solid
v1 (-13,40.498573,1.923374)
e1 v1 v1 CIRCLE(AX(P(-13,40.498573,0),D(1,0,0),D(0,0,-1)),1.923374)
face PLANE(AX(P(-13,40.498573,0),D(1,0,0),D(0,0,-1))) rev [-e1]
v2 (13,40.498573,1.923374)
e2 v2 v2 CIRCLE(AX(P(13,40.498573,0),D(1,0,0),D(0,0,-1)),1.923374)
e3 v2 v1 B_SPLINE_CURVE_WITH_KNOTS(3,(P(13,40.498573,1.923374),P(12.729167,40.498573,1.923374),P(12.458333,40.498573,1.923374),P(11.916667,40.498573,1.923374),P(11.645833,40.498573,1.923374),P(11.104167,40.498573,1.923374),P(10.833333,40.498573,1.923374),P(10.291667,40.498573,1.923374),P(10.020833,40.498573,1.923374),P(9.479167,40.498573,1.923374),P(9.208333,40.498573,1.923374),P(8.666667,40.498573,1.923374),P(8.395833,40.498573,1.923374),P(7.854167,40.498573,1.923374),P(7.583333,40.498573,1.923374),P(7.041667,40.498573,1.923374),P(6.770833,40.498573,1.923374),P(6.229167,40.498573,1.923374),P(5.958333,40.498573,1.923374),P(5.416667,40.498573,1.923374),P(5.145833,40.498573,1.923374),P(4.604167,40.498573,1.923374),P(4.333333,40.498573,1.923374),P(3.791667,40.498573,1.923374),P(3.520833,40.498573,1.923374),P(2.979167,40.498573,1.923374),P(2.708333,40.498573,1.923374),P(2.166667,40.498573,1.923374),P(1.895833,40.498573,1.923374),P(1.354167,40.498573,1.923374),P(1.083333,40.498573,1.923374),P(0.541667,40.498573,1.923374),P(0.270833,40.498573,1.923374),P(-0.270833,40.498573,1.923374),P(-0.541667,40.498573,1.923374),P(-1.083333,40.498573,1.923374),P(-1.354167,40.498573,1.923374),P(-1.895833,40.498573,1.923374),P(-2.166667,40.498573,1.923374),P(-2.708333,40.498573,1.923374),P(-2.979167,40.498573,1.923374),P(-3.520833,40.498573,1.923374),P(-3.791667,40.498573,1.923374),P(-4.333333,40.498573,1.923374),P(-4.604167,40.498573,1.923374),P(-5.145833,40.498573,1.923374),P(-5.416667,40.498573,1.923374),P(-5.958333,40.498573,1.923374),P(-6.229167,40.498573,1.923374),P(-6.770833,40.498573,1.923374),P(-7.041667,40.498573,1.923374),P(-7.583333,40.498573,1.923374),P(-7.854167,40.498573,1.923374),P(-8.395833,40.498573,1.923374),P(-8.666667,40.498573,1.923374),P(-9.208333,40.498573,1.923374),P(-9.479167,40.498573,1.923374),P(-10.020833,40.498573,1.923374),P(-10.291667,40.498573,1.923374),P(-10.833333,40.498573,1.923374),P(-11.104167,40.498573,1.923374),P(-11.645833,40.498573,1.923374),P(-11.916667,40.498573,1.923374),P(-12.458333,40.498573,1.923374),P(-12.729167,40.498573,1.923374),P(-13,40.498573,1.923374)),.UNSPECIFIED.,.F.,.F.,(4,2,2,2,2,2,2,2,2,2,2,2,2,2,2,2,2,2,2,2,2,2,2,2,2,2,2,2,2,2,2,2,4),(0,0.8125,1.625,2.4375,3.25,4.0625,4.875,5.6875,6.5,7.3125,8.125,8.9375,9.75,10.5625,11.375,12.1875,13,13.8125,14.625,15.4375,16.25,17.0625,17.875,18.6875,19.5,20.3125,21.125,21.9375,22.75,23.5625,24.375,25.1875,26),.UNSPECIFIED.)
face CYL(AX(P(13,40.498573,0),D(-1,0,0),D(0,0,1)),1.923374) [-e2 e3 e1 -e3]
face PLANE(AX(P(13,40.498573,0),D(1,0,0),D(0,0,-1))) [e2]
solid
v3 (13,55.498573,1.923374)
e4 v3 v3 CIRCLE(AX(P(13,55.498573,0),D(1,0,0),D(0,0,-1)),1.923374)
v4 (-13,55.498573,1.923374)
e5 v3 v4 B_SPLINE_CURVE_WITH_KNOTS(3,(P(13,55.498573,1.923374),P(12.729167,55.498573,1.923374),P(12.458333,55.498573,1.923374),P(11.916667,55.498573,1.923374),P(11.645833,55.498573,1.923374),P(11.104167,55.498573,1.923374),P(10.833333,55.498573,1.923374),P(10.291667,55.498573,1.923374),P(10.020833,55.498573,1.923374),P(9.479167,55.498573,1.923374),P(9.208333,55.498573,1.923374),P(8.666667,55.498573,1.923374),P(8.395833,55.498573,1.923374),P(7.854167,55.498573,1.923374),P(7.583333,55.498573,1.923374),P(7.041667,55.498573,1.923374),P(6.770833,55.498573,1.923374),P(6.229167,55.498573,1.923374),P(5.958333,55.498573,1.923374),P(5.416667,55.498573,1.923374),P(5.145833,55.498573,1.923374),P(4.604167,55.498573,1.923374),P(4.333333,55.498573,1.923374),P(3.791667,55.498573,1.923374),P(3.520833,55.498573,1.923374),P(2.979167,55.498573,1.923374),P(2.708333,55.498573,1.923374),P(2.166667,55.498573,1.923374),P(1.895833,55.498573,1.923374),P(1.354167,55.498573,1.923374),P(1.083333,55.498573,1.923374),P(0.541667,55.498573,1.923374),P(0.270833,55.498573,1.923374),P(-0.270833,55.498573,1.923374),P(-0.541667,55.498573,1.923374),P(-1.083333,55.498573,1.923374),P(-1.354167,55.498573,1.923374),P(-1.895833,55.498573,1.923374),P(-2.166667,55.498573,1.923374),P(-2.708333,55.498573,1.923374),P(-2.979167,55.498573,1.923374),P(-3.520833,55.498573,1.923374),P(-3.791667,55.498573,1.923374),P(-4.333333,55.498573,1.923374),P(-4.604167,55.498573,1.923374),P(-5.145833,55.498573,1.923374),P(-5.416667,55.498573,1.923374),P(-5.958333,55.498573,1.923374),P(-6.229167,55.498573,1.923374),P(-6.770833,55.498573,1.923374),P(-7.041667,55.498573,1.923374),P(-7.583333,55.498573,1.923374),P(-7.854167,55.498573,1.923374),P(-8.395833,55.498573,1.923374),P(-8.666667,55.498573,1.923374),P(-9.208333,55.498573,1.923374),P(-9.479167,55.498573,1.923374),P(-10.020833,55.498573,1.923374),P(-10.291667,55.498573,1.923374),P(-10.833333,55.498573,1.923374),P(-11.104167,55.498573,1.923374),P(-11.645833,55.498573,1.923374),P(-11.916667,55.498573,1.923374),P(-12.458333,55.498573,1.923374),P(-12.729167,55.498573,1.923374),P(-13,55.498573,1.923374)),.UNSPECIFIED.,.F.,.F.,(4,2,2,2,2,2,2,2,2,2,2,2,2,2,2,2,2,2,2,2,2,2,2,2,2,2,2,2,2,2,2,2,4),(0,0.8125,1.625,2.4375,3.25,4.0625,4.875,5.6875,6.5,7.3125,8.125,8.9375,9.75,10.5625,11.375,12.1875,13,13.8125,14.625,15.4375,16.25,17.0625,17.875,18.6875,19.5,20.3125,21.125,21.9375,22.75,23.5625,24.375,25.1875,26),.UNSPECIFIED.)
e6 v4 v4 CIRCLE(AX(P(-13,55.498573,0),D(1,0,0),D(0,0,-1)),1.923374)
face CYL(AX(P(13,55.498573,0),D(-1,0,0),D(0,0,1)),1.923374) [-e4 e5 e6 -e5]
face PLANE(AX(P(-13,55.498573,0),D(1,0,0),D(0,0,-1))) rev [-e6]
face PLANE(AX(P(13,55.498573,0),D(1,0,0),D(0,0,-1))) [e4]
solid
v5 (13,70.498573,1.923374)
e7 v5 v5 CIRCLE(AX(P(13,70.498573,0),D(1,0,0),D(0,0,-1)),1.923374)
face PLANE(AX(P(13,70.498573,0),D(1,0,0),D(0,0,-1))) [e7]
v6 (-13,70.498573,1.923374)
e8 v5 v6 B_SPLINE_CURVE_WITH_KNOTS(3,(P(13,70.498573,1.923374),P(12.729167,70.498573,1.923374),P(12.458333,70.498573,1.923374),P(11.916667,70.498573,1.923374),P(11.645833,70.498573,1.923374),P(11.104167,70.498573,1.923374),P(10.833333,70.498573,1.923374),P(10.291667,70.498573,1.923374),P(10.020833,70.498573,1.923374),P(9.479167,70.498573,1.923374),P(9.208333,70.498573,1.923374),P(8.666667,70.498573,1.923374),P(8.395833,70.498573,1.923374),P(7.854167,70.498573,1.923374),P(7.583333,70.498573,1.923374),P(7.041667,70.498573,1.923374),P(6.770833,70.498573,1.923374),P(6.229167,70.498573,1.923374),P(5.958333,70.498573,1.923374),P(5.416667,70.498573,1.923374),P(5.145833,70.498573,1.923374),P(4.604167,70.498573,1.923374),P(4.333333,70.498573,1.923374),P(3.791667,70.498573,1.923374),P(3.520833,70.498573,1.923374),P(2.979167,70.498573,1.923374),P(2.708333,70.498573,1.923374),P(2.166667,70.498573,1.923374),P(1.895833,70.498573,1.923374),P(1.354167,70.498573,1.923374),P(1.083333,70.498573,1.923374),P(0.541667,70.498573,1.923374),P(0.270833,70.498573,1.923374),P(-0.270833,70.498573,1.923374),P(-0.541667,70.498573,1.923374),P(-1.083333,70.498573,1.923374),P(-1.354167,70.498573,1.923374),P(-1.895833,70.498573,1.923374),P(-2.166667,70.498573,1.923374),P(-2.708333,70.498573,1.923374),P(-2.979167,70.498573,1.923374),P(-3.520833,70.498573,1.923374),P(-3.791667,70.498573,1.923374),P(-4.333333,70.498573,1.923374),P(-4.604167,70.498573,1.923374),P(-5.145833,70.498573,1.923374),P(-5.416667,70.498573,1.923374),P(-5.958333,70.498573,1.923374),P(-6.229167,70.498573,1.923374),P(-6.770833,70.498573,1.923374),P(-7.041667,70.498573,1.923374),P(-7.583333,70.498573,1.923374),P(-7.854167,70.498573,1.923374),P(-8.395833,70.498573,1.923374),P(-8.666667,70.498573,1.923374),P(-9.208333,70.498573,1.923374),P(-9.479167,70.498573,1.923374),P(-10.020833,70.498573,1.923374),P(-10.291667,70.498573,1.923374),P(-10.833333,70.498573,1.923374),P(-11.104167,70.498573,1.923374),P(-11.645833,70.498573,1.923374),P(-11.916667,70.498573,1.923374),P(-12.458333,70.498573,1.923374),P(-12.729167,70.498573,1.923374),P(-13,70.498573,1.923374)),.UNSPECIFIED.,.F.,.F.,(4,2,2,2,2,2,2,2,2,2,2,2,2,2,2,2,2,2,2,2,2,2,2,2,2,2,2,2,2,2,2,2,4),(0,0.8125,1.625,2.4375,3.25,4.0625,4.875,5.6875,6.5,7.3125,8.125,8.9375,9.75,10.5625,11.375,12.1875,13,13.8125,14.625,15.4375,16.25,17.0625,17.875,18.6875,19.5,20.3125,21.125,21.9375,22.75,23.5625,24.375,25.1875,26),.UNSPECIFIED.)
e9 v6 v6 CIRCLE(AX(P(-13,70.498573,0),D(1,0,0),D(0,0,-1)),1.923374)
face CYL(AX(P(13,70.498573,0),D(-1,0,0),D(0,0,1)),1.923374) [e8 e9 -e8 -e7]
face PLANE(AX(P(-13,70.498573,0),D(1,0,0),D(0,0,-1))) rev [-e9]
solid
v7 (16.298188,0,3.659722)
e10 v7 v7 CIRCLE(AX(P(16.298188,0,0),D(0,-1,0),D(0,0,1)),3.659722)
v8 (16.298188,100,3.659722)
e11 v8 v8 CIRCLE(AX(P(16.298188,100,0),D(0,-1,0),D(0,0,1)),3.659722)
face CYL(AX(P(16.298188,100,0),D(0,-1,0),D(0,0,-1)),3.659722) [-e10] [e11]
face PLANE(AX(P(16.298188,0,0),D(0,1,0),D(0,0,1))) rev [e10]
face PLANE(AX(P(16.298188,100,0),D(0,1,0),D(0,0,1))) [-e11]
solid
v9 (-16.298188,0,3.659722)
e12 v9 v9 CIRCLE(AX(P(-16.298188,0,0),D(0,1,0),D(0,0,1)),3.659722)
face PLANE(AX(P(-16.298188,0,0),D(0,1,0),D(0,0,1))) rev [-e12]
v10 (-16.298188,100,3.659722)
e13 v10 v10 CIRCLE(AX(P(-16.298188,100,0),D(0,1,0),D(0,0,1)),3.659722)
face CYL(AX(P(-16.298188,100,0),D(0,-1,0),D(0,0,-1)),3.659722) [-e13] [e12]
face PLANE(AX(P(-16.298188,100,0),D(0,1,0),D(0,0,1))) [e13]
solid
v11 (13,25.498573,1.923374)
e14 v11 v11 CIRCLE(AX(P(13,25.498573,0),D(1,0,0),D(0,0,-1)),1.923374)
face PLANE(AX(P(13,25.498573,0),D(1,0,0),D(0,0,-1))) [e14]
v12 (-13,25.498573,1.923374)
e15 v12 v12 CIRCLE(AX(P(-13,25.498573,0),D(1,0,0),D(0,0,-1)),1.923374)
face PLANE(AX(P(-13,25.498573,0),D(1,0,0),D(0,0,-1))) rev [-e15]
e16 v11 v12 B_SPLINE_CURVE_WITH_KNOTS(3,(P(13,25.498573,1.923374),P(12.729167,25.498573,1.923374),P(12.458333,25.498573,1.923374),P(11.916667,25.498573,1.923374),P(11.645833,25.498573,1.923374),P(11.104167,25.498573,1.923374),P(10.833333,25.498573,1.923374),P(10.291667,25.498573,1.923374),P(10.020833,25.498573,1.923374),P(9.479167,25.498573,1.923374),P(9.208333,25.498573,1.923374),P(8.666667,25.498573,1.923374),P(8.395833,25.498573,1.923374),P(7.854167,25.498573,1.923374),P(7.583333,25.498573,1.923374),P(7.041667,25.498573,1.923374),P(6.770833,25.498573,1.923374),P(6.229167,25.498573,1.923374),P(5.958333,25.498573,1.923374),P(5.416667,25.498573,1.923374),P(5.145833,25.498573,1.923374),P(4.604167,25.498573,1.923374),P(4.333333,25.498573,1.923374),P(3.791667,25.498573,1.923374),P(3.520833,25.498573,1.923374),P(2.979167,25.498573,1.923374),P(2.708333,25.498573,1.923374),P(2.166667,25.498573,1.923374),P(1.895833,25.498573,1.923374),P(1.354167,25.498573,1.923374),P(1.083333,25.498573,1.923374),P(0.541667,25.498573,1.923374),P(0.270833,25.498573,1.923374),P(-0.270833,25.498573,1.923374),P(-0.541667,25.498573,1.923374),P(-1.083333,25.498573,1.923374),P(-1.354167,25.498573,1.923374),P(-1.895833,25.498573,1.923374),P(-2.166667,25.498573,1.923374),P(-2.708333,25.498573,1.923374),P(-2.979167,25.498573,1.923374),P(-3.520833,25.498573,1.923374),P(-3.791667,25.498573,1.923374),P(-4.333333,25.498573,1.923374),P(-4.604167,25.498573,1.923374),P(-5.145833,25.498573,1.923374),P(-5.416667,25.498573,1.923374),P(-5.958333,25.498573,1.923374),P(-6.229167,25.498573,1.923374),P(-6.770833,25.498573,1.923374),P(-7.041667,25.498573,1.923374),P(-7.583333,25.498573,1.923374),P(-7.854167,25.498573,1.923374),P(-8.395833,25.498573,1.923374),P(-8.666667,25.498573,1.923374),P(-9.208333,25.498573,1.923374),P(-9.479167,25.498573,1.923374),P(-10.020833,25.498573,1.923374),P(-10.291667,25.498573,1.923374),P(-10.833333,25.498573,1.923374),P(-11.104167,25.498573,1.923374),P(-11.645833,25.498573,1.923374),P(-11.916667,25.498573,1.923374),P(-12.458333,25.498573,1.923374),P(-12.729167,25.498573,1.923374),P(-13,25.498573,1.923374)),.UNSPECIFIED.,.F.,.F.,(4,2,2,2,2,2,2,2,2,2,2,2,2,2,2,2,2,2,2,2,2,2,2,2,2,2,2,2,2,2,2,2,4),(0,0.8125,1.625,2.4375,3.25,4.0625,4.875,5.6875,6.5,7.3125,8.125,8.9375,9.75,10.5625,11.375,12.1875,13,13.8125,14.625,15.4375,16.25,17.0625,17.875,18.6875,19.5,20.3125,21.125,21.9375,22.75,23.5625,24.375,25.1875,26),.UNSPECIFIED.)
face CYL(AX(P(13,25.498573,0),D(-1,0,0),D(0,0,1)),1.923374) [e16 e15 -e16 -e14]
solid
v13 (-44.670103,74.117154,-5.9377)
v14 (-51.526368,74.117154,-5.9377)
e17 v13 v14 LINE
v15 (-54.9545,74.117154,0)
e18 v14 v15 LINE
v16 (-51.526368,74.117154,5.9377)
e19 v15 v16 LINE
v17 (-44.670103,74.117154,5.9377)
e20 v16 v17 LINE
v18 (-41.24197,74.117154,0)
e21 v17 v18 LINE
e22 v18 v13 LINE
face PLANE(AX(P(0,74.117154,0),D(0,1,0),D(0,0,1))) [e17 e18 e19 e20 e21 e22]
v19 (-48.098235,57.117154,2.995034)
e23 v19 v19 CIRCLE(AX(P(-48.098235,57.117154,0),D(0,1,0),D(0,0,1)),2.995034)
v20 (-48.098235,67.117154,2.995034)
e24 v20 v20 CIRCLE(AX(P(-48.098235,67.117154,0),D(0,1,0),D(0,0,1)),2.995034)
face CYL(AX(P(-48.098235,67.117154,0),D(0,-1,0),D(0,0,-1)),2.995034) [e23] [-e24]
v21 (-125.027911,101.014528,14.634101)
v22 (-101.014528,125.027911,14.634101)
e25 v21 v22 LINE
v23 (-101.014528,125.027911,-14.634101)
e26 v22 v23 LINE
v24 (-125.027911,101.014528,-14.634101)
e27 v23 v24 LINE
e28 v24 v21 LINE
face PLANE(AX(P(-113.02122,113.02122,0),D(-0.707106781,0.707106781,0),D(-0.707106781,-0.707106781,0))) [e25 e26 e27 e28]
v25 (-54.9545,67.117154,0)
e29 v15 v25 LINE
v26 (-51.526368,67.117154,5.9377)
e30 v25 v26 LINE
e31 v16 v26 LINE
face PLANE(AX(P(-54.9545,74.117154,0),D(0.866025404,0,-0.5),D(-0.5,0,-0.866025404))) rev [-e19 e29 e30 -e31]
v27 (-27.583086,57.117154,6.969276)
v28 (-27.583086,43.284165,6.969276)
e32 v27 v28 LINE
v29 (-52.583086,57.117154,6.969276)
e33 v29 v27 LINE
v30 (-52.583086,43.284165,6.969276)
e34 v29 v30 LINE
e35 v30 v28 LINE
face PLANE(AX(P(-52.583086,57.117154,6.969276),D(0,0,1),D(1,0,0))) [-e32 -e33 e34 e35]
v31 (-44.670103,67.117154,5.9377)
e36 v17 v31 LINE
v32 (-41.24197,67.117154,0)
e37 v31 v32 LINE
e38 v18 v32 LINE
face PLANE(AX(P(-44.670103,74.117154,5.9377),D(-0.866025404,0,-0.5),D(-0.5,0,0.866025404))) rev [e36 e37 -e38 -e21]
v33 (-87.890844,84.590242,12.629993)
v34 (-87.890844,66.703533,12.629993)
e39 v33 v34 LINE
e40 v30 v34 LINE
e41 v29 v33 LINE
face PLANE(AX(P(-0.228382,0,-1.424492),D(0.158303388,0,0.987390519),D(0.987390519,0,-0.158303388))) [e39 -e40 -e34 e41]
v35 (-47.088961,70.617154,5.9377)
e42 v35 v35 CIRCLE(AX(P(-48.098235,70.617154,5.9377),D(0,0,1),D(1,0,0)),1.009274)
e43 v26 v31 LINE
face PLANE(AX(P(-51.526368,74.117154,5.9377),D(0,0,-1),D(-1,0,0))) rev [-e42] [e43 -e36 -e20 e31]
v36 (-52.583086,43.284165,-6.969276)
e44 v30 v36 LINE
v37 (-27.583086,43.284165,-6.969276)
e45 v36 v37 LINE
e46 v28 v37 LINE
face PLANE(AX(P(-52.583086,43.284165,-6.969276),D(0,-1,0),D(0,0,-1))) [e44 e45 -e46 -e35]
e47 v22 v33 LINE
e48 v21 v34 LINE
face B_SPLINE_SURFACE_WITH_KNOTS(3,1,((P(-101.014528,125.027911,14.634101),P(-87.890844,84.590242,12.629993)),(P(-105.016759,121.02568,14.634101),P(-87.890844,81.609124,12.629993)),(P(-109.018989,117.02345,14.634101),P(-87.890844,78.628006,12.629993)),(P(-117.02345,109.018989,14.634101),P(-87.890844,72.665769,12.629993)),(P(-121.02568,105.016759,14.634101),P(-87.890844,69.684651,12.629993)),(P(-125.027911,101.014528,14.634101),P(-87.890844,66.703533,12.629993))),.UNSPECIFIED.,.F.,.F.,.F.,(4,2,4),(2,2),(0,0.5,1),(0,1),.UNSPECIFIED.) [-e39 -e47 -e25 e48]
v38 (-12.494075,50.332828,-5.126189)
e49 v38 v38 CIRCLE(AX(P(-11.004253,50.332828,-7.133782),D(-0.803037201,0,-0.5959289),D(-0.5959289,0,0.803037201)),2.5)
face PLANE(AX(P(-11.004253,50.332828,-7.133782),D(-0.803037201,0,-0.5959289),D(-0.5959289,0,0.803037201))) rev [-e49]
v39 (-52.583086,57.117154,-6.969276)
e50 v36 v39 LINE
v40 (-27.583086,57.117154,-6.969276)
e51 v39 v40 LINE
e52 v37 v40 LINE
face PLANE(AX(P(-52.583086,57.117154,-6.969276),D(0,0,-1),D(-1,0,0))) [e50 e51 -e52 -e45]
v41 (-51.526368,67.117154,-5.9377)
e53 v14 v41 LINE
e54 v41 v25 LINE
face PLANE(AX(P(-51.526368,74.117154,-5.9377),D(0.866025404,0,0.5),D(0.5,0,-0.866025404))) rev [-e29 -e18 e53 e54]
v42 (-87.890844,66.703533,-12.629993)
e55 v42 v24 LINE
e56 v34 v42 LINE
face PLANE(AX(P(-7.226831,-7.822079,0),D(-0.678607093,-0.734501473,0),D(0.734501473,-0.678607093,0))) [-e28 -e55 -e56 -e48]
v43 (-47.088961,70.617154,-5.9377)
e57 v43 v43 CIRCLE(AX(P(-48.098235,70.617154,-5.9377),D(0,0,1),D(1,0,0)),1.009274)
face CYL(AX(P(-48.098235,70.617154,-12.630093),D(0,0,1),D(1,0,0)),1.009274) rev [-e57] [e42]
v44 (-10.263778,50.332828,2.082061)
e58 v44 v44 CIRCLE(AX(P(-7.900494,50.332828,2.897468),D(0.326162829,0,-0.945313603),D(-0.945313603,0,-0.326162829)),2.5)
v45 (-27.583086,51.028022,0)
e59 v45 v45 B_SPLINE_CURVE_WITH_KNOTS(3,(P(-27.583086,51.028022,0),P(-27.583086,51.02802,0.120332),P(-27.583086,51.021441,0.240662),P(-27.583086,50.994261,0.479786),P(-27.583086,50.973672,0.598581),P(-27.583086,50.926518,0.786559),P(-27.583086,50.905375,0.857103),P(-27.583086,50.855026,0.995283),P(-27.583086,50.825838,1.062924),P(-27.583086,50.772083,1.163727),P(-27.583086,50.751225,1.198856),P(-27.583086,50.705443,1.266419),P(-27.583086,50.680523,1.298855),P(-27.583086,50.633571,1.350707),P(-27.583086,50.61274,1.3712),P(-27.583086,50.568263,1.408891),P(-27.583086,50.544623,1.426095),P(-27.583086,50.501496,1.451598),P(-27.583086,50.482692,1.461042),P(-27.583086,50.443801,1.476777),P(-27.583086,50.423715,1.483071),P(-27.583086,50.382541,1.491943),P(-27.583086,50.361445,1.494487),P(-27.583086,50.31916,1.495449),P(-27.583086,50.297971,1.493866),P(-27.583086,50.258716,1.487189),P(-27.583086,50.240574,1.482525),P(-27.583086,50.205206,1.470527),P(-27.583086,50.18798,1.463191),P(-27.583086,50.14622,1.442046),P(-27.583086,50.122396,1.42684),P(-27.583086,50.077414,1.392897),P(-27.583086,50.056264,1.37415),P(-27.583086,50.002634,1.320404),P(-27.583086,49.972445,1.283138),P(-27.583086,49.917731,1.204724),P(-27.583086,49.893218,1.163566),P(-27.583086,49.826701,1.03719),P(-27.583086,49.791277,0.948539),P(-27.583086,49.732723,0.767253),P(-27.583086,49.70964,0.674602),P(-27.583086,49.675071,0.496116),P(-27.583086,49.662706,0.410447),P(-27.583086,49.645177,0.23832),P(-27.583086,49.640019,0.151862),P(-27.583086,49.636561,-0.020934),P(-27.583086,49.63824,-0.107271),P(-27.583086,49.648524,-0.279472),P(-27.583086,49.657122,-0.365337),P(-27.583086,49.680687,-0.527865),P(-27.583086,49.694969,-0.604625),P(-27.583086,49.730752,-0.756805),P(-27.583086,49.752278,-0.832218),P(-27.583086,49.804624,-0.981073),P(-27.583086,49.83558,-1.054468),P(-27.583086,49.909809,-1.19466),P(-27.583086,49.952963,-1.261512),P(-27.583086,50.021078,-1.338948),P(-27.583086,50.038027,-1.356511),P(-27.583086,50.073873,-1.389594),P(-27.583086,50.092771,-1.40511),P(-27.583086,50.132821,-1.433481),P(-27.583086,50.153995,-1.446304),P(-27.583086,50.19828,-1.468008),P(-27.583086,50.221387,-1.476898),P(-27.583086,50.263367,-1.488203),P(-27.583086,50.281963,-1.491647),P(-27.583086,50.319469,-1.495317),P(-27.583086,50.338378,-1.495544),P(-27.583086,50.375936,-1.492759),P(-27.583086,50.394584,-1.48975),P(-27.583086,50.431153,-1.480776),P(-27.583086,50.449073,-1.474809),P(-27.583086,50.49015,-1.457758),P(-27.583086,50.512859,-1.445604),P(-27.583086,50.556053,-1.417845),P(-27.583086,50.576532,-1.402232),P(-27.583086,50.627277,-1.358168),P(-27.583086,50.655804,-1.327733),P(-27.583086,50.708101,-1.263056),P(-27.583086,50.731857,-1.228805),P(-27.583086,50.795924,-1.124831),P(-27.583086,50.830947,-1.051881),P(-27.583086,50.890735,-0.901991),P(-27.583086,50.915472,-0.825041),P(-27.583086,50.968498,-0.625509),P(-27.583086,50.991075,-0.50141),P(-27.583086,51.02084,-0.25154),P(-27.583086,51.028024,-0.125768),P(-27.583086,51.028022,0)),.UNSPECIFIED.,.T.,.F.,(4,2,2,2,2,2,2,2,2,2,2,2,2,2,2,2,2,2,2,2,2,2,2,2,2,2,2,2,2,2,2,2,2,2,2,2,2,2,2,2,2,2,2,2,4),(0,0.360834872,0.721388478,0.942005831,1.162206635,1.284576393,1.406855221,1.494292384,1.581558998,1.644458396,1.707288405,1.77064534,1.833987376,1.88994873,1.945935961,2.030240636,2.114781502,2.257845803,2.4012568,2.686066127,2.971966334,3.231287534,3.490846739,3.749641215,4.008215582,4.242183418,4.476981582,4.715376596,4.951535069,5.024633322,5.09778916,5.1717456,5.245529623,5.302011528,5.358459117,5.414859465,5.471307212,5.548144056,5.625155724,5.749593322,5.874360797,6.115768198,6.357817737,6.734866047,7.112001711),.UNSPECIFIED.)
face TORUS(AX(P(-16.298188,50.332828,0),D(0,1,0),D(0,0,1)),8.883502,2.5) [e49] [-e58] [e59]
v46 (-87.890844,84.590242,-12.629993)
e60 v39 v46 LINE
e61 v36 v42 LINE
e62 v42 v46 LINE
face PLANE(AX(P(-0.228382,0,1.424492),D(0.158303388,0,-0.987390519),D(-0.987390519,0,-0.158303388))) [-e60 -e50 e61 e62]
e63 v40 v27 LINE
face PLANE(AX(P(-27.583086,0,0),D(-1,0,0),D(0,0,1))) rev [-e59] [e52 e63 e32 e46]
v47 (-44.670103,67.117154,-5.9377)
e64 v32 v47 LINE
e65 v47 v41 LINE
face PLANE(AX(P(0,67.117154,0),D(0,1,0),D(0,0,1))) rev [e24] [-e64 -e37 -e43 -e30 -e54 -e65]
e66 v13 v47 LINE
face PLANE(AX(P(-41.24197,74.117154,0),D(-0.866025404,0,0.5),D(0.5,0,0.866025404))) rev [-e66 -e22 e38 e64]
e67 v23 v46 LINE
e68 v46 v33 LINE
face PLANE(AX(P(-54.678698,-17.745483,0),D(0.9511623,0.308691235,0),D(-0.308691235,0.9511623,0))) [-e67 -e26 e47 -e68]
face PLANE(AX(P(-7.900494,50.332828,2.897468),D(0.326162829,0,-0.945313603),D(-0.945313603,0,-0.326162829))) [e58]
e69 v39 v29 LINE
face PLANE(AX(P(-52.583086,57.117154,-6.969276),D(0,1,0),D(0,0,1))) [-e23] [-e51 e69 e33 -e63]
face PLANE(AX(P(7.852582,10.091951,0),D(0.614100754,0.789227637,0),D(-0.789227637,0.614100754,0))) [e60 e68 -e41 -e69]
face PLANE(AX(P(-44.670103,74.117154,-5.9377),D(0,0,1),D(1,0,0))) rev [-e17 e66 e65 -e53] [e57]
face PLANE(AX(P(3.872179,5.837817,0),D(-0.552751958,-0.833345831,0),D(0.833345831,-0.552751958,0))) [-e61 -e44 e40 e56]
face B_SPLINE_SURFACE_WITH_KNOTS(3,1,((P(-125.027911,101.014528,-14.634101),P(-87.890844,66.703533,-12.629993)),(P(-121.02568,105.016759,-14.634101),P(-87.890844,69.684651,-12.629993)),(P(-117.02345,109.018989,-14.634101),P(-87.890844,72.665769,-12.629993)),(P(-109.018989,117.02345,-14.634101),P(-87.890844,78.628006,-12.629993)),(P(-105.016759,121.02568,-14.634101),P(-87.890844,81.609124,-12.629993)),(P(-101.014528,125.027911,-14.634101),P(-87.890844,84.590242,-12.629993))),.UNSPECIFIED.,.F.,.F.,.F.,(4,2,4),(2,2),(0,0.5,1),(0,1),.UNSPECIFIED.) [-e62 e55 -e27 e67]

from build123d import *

# Parameters (mm, degrees)
SKETCH_1_R            = 3.659721806
EXTRUDE_1_DEPTH       = 100
SKETCH_2_R            = 1.923374245
EXTRUDE_2_DEPTH       = 13
MOVE_START            = -13
MOVE_BODY_4_OUTLINE_R = 1.923374245
MOVE_BODY_4_DEPTH     = 26
SWEEP_4_PROFILE_R     = 2.5
SKETCH_28_W           = 13.938552386
SKETCH_28_H           = 13.832988403
EXTRUDE_3_DEPTH       = 25
SKETCH_31_R           = 2.995033529
EXTRUDE_4_DEPTH       = 10
EXTRUDE_5_DEPTH       = 7
SKETCH_33_R           = 1.00927381
CUT_EXTRUDE_1_DEPTH   = 135.423062289


# Read off the part's stored shape, not the designer's step: 实体-移动/复制4
with BuildPart() as part:
    # 草图1 → 凸台-拉伸1 (new body)
    with BuildSketch(Plane(origin=(0, 0, 0), x_dir=(1, 0, 0), z_dir=(0, 1, 0))):
        with Locations(Location((-16.298188438, 0, 0), (0, 0, 270))):
            Circle(SKETCH_1_R)
    extrude(amount=EXTRUDE_1_DEPTH)


with BuildPart() as body_2:
    # 镜向5: mirrored copy
    add(part.part.mirror(Plane(origin=(0, 0, 0), x_dir=(0, 0, 1), z_dir=(1, 0, 0))))


with BuildPart() as body_3:
    # 草图2 → 凸台-拉伸2 (new, symmetric)
    with BuildSketch(Plane(origin=(0, 0, 0), x_dir=(0, 0, -1), z_dir=(1, 0, 0))):
        with Locations(Location((0, 70.49857282, 0), (0, 0, 180))):
            Circle(SKETCH_2_R)
    extrude(amount=EXTRUDE_2_DEPTH, both=True)


with BuildPart() as body_4:
    # Move Body 3: copy of body 3
    add(body_3.part.moved(Location((0, -15, 0))))


with BuildPart() as body_5:
    # Move Body 4 outline → Move Body 4 (new body)
    with BuildSketch(Plane.YZ.offset(MOVE_START)):
        with Locations((40.49857282, 0)):
            Circle(MOVE_BODY_4_OUTLINE_R)
        with Locations((25.49857282, 0)):
            Circle(MOVE_BODY_4_OUTLINE_R)
    extrude(amount=MOVE_BODY_4_DEPTH)


with BuildPart() as body_6:
    # 扫描4: sweep along a path in 草图21
    with BuildLine(Plane(origin=(0, 0, 0), x_dir=(1, 0, 0), z_dir=(0, 1, 0))) as sweep_4_path:
        ThreePointArc((-11.004253152, 7.133782197), (-24.784747158, -2.625818033), (-7.900493606, -2.89746799))
    # 扫描4 profile (on start of the path) → 扫描4 (sweep)
    with BuildSketch(Plane(origin=(-11.004253152, 0, -7.133782197), x_dir=(0.5959288997346694, 0, -0.8030372011688042), z_dir=(-0.8030372011688042, 0, -0.5959288997346694))):
        Circle(SWEEP_4_PROFILE_R)
    sweep(path=sweep_4_path.line)


with BuildPart() as body_6_1:
    # Move Body 5: moved
    add(body_6.part.moved(Location((0, 50.332827788, 0))))

    # 草图28 → 凸台-拉伸3 (add)
    with BuildSketch(Plane(origin=(-27.583086443, 0, 0), x_dir=(0, 0, -1), z_dir=(1, 0, 0))):
        with Locations((0, 50.200659589)):
            Rectangle(SKETCH_28_W, SKETCH_28_H)
    extrude(amount=-EXTRUDE_3_DEPTH)

    # 草图30 → 放样2 section 0
    with BuildSketch(Plane.ZY.offset(52.583086443)):
        with BuildLine():
            Line((-6.969276193, 43.284165387), (6.969276193, 43.284165387))
            Line((6.969276193, 43.284165387), (6.969276193, 57.11715379))
            Line((6.969276193, 57.11715379), (-6.969276193, 57.11715379))
            Line((-6.969276193, 57.11715379), (-6.969276193, 43.284165387))
        make_face()
    # 草图29 → 放样2 section 1
    with BuildSketch(Plane(origin=(-87.890844006, 0, 0), x_dir=(0, 0, -1), z_dir=(1, 0, 0))):
        with BuildLine():
            Line((12.629992537, 84.590242061), (-12.629992537, 84.590242061))
            Line((-12.629992537, 84.590242061), (-12.629992537, 66.703532711))
            Line((-12.629992537, 66.703532711), (12.629992537, 66.703532711))
            Line((12.629992537, 66.703532711), (12.629992537, 84.590242061))
        make_face()
    loft()

    # 草图31 → 凸台-拉伸4 (add)
    with BuildSketch(Plane(origin=(0, 57.11715379, 0), x_dir=(1, 0, 0), z_dir=(0, 1, 0))):
        with Locations(Location((-48.098235143, 0, 0), (0, 0, 270))):
            Circle(SKETCH_31_R)
    extrude(amount=EXTRUDE_4_DEPTH)

    # 草图32 → 凸台-拉伸5 (add)
    with BuildSketch(Plane(origin=(0, 67.11715379, 0), x_dir=(1, 0, 0), z_dir=(0, 1, 0))):
        Polygon((-41.241970146, 0), (-44.670102644, 5.937699663), (-51.526367642, 5.937699663), (-54.95450014, 0), (-51.526367642, -5.937699663), (-44.670102644, -5.937699663), align=None)
    extrude(amount=EXTRUDE_5_DEPTH)

    # 草图33 → 切除-拉伸1 (cut, through all)
    with BuildSketch(Plane.XY.offset(5.937699663)):
        with Locations((-48.098235143, 70.61715379)):
            Circle(SKETCH_33_R)
    extrude(amount=-CUT_EXTRUDE_1_DEPTH, mode=Mode.SUBTRACT)

    # 草图36 → 放样7 section 0
    with BuildSketch(Plane(origin=(-113.021219596, 113.021219596, 0), x_dir=(0.7071067811865477, 0.7071067811865475, 0), z_dir=(-0.7071067811865475, 0.7071067811865477, 0))):
        with BuildLine():
            Line((-16.980025472, 14.6341009), (16.980025472, 14.6341009))
            Line((16.980025472, 14.6341009), (16.980025472, -14.6341009))
            Line((16.980025472, -14.6341009), (-16.980025472, -14.6341009))
            Line((-16.980025472, -14.6341009), (-16.980025472, 14.6341009))
        make_face()
    # 草图35 → 放样7 section 1
    with BuildSketch(Plane.ZY.offset(87.890844006)):
        with BuildLine():
            Line((-12.629992537, 66.703532711), (12.629992537, 66.703532711))
            Line((12.629992537, 66.703532711), (12.629992537, 84.590242061))
            Line((12.629992537, 84.590242061), (-12.629992537, 84.590242061))
            Line((-12.629992537, 84.590242061), (-12.629992537, 66.703532711))
        make_face()
    loft()


solid = Compound([part.part, body_2.part, body_3.part, body_4.part, body_5.part, body_6_1.part])
